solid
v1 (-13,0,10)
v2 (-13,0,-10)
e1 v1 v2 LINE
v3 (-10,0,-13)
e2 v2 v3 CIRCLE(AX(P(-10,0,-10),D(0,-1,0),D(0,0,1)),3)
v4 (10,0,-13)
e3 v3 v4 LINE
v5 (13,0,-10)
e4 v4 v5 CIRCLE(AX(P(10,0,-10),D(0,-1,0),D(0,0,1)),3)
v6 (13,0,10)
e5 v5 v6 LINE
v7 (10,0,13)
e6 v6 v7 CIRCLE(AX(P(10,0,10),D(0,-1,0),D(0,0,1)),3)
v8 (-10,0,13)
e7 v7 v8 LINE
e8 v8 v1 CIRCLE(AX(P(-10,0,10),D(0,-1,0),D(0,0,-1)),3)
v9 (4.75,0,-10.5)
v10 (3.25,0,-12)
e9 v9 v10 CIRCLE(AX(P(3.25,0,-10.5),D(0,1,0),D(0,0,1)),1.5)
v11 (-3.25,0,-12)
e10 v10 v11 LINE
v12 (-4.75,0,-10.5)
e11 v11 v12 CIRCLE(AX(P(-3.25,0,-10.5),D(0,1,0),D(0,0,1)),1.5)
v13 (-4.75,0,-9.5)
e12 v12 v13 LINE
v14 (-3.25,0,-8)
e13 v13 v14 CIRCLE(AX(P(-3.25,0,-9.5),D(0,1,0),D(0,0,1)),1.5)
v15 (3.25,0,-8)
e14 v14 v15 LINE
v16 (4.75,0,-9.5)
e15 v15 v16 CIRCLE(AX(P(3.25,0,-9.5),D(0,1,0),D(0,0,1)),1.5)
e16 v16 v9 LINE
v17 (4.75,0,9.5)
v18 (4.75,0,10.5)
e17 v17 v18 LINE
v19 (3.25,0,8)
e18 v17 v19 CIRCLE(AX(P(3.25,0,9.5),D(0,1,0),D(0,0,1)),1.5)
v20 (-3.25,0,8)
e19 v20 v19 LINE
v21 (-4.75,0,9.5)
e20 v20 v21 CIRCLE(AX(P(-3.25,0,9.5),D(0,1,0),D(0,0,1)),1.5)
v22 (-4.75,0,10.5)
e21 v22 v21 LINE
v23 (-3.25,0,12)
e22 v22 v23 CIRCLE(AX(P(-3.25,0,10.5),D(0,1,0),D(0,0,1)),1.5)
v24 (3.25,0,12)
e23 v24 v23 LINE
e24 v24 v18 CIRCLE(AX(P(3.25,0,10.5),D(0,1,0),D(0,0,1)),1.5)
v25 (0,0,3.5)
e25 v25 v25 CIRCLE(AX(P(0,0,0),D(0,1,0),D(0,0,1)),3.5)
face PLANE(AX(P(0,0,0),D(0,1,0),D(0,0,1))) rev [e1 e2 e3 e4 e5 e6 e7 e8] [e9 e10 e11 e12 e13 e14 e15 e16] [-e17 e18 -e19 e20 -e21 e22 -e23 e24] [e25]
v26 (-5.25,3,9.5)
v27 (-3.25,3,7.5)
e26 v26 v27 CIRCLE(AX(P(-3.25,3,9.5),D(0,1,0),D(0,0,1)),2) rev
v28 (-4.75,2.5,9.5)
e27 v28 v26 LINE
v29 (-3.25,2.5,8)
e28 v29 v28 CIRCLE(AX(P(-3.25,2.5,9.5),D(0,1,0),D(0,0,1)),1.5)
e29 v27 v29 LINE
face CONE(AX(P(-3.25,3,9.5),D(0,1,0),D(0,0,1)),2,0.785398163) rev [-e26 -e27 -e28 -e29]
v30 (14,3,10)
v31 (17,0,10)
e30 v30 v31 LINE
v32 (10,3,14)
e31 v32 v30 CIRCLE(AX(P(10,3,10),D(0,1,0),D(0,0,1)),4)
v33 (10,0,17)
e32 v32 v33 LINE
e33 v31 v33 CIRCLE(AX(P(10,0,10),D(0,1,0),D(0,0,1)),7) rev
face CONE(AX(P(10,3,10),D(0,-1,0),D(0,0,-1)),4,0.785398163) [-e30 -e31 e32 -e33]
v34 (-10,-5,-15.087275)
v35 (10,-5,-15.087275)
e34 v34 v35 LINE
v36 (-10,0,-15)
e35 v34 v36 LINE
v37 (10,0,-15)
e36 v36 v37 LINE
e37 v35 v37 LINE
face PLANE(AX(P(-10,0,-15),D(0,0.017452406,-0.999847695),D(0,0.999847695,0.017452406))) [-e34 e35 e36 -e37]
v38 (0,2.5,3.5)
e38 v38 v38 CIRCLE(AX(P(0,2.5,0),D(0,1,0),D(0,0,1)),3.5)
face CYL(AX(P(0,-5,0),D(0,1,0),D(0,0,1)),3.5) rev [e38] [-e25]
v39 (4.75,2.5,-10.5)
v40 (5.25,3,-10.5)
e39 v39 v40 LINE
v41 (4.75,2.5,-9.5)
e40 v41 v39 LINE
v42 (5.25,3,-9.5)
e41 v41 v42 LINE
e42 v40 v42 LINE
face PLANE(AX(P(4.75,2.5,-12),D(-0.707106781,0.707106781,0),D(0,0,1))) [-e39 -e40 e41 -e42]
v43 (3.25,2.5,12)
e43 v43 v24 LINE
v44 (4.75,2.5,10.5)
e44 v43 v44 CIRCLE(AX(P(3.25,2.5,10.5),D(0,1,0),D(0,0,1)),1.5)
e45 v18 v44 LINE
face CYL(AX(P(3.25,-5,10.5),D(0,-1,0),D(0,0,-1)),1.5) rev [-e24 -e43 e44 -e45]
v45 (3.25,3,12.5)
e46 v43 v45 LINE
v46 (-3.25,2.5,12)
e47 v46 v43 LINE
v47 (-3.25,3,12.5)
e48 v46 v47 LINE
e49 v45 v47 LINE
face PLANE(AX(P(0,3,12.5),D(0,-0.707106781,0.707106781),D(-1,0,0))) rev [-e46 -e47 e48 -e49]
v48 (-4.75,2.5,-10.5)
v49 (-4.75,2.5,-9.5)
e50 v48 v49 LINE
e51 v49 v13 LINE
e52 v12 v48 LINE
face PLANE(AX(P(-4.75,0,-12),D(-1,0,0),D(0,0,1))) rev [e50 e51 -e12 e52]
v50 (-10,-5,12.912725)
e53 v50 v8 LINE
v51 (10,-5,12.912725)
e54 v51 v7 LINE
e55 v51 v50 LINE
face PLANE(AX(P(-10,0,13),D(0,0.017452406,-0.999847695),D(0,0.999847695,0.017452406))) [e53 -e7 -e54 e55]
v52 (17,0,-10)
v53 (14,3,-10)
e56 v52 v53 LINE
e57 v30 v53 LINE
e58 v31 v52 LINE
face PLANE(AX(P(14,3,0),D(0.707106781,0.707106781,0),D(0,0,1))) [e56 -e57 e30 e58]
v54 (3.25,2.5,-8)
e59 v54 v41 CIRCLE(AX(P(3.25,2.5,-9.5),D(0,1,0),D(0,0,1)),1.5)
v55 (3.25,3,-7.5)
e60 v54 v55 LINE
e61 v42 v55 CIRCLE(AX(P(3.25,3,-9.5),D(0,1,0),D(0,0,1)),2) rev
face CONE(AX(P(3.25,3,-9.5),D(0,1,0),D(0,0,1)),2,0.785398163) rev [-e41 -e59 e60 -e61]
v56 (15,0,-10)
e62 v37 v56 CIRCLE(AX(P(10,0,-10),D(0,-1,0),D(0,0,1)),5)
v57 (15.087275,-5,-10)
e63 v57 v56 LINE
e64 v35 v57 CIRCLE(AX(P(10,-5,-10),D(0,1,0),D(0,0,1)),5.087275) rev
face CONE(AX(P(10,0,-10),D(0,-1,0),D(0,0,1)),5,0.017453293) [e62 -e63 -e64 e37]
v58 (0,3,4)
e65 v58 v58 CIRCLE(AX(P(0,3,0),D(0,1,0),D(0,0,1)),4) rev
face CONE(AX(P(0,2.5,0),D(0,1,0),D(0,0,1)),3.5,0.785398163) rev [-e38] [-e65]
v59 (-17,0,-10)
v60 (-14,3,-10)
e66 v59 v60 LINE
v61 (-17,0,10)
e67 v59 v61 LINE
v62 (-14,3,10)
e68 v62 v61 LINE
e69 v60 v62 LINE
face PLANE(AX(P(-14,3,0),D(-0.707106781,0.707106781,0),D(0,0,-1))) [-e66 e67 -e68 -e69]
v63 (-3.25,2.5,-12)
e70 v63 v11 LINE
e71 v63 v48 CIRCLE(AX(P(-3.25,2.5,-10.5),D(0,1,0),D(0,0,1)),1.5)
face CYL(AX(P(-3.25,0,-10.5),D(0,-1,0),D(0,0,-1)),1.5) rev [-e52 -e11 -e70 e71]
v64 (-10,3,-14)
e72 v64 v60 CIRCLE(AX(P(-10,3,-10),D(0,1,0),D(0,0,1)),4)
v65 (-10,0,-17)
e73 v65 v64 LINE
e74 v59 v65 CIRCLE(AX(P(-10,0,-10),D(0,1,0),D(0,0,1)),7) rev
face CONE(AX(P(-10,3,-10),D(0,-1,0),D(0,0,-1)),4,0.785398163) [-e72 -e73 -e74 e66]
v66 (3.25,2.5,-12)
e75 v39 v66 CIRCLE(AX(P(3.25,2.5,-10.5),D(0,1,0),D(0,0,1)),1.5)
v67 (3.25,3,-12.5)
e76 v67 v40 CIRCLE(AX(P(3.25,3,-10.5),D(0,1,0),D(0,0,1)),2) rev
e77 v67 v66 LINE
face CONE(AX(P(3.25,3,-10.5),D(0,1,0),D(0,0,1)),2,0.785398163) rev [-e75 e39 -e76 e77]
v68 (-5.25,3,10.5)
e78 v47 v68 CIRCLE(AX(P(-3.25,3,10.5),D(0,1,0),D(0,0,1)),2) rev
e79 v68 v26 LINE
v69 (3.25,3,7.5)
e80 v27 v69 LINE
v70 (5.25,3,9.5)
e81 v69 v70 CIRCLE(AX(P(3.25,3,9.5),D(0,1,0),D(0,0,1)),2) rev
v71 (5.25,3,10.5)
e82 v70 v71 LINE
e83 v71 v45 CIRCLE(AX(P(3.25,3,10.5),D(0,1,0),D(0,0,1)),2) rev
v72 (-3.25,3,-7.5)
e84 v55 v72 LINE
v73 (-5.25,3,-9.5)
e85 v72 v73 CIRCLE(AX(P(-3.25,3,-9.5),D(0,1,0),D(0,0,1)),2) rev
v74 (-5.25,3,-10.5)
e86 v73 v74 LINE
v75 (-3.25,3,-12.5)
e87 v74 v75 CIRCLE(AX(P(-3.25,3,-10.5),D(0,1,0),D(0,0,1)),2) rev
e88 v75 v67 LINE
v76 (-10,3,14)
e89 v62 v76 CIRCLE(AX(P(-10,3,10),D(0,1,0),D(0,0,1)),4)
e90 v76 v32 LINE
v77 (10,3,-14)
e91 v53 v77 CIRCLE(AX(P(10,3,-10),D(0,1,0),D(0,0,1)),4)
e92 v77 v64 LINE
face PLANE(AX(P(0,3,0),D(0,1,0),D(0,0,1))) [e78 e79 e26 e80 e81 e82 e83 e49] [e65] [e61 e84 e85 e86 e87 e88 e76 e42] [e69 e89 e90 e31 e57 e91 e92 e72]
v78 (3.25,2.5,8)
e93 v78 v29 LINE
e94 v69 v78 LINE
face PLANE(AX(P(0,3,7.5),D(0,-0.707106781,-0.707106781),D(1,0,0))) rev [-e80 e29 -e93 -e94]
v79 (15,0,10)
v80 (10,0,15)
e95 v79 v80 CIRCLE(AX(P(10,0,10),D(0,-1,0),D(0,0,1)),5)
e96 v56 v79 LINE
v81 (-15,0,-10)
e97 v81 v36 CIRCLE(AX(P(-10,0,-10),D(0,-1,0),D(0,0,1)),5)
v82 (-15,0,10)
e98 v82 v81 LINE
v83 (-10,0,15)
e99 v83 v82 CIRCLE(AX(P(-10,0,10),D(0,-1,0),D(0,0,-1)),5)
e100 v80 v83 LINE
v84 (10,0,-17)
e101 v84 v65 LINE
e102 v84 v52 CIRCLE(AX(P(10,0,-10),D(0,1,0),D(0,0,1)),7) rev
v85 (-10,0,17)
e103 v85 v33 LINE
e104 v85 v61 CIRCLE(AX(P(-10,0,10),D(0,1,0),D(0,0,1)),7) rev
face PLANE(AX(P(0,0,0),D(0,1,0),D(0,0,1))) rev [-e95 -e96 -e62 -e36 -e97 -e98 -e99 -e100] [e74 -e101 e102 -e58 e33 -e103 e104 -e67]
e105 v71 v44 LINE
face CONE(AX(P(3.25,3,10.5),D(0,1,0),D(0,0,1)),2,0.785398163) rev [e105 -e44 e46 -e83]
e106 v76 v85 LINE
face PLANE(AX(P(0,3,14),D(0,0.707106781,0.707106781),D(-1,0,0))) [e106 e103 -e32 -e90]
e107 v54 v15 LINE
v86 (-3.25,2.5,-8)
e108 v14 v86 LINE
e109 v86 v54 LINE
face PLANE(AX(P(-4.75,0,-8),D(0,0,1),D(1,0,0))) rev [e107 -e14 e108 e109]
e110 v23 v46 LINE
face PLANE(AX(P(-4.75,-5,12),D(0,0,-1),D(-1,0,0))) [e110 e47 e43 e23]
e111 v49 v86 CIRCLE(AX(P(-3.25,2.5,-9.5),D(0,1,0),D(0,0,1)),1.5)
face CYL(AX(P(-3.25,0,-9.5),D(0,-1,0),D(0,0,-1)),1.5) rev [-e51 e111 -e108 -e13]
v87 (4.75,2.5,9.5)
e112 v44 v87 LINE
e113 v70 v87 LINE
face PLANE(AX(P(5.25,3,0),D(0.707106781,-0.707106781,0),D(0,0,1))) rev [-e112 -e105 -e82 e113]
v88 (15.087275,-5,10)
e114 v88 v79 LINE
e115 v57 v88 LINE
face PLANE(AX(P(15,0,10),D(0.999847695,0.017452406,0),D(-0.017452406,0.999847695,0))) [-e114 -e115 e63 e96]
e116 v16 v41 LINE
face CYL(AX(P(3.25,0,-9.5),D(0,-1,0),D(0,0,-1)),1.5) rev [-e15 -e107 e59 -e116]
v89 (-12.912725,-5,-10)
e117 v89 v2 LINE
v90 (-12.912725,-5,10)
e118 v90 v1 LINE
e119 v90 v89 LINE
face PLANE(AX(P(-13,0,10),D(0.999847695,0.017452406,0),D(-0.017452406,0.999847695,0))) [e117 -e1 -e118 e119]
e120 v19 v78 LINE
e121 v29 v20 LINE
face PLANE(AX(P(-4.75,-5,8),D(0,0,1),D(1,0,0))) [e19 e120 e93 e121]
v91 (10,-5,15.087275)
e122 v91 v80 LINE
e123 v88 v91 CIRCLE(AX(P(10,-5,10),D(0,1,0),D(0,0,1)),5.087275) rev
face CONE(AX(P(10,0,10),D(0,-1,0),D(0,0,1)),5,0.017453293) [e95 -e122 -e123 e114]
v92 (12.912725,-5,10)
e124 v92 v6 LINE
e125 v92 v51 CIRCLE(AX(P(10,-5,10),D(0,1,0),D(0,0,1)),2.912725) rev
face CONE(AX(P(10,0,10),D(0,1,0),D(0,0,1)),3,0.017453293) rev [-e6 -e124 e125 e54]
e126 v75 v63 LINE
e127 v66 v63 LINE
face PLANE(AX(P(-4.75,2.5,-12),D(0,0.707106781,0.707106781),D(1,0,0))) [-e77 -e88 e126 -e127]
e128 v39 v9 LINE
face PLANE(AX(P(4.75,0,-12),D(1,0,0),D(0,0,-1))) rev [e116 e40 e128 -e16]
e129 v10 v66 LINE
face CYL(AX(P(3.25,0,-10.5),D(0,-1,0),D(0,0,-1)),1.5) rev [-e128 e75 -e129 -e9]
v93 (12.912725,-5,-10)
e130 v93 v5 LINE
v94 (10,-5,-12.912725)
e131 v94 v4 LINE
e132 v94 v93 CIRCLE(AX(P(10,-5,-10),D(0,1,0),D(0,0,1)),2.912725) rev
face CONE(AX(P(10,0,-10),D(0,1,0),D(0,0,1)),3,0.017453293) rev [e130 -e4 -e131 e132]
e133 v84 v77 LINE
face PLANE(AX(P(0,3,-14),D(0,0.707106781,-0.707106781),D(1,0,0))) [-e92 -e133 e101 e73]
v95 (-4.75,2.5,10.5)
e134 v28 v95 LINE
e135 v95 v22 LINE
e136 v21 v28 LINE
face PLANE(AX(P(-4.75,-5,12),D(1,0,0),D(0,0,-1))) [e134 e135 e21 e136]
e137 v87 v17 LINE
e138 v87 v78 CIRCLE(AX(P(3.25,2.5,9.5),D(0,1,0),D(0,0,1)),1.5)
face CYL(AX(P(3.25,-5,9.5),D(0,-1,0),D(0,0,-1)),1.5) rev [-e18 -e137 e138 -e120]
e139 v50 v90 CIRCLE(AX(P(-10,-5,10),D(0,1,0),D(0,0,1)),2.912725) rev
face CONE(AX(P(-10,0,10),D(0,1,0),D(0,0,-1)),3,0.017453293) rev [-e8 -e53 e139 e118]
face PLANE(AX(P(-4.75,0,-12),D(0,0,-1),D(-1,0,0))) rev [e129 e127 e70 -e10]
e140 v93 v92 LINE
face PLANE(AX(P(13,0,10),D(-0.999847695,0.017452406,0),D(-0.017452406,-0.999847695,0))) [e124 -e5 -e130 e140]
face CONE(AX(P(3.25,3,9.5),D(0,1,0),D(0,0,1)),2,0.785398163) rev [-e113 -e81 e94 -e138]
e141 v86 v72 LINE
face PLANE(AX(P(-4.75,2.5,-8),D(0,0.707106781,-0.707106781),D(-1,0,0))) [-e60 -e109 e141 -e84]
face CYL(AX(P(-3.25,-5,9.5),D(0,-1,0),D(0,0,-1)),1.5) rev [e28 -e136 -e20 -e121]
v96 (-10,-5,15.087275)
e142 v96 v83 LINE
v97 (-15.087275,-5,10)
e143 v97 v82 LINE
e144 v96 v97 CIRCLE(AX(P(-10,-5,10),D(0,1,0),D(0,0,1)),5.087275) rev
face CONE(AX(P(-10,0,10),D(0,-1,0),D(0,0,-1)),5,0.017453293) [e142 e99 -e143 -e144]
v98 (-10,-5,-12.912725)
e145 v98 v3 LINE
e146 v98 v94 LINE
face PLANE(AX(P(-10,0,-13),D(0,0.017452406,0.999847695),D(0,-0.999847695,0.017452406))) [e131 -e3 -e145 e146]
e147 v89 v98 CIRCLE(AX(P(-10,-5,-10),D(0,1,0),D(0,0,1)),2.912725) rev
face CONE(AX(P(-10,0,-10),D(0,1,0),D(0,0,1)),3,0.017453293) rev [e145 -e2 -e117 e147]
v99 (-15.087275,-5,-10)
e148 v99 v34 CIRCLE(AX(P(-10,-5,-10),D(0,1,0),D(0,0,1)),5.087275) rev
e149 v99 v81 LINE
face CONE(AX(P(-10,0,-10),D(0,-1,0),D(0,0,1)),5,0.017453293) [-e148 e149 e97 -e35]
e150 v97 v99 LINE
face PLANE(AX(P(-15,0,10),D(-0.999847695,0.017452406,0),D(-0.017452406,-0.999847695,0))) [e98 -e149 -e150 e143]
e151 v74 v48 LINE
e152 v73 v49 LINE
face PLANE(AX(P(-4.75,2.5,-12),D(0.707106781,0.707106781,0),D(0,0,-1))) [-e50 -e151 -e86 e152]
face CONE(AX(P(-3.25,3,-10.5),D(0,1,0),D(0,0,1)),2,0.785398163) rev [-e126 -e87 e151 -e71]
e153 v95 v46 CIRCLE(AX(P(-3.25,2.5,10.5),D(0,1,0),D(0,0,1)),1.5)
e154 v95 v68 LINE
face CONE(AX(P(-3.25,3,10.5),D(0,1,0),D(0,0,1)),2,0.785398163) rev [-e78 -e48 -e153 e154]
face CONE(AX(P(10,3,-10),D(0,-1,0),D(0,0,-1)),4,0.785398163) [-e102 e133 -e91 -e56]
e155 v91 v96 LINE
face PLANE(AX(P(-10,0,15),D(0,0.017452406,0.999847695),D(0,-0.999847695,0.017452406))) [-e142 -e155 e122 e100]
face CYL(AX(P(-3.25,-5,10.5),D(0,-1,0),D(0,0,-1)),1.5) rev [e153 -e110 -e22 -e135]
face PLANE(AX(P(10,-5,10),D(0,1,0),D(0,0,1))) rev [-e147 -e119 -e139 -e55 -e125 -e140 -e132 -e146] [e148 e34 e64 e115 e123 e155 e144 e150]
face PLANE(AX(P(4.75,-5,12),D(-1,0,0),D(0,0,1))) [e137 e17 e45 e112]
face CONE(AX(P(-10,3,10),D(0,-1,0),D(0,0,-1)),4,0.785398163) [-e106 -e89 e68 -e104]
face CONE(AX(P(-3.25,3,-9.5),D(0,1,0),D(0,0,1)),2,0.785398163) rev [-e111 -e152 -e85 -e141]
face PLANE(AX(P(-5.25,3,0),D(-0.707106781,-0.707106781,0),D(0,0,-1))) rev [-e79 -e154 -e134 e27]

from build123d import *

# Parameters (mm, degrees)
CROQUIS1_W                 = 34
CROQUIS1_H                 = 34
SALIENTE_EXTRUIR1_DEPTH    = 3
REDONDEO1_R                = 7
CHAFL_N1_SIZE              = 3
CROQUIS2_W                 = 9.5
CROQUIS2_H                 = 4
CORTAR_EXTRUIR1_DEPTH      = 25.228082879
REDONDEO2_R                = 1.5
CHAFL_N2_SIZE              = 0.5
SALIENTE_EXTRUIR2_DEPTH    = 5
SALIENTE_EXTRUIR2_DRAFT    = -1
CROQUIS9_R                 = 3.5
CORTAR_EXTRUIR2_DEPTH      = 26.337718919
CHAFL_N3_SIZE              = 0.5
REDONDEO2_OF_SIMETR_A1_R   = 1.5
CHAFL_N2_OF_SIMETR_A1_SIZE = 0.5


with BuildPart() as part:
    # Croquis1 → Saliente-Extruir1 (new body)
    with BuildSketch(Plane(origin=(0, 0, 0), x_dir=(1, 0, 0), z_dir=(0, 1, 0))):
        Rectangle(CROQUIS1_W, CROQUIS1_H)
    extrude(amount=SALIENTE_EXTRUIR1_DEPTH)

    # Redondeo1
    redondeo1_edges = [part.edges().sort_by_distance(p)[0] for p in [
        (17, 1.5, 17),
        (-17, 1.5, 17),
        (-17, 1.5, -17),
        (17, 1.5, -17),
    ]]
    fillet(redondeo1_edges, radius=REDONDEO1_R)

    # Chaflán1
    chafl_n1_edges = [part.edges().sort_by_distance(p)[0] for p in [
        (17, 3, 0),
        (14.949747468, 3, -14.949747468),
        (14.949747468, 3, 14.949747468),
        (0, 3, -17),
        (0, 3, 17),
        (-14.949747468, 3, -14.949747468),
        (-14.949747468, 3, 14.949747468),
        (-17, 3, 0),
    ]]
    chamfer(chafl_n1_edges, length=CHAFL_N1_SIZE - 0.0001)  # a hair under: the kernel refuses the full size

    # Croquis2 → Cortar-Extruir1 (cut, through all)
    with BuildSketch(Plane(origin=(0, 3, 0), x_dir=(1, 0, 0), z_dir=(0, 1, 0))):
        with Locations((0, 10)):
            Rectangle(CROQUIS2_W, CROQUIS2_H)
    cortar_extruir1 = extrude(amount=-CORTAR_EXTRUIR1_DEPTH, mode=Mode.SUBTRACT)

    # Redondeo2
    redondeo2_edges = [part.edges().sort_by_distance(p)[0] for p in [
        (4.75, 1.5, -12),
        (4.75, 1.5, -8),
        (-4.75, 1.5, -8),
        (-4.75, 1.5, -12),
    ]]
    fillet(redondeo2_edges, radius=REDONDEO2_R)

    # Chaflán2
    chafl_n2_edges = [part.edges().sort_by_distance(p)[0] for p in [
        (0, 3, -8),
        (-4.75, 3, -10),
        (4.75, 3, -10),
        (0, 3, -12),
        (-4.310660172, 3, -8.439339828),
        (4.310660172, 3, -8.439339828),
        (4.310660172, 3, -11.560660172),
        (-4.310660172, 3, -11.560660172),
    ]]
    chamfer(chafl_n2_edges, length=CHAFL_N2_SIZE)


with BuildPart() as saliente_extruir2_tool:
    # Croquis8 → Saliente-Extruir2 (with draft: the straight prism first)
    with BuildSketch(Plane.XZ):
        with BuildLine():
            ThreePointArc((-10, 15), (-13.535533906, 13.535533906), (-15, 10))
            Line((-15, 10), (-15, -10))
            ThreePointArc((-15, -10), (-13.535533906, -13.535533906), (-10, -15))
            Line((-10, -15), (10, -15))
            ThreePointArc((10, -15), (13.535533906, -13.535533906), (15, -10))
            Line((15, -10), (15, 10))
            ThreePointArc((15, 10), (13.535533906, 13.535533906), (10, 15))
            Line((10, 15), (-10, 15))
        make_face()
        with BuildLine():
            Line((-13, 10), (-13, -10))
            ThreePointArc((-13, -10), (-12.121320344, -12.121320344), (-10, -13))
            Line((-10, -13), (10, -13))
            ThreePointArc((10, -13), (12.121320344, -12.121320344), (13, -10))
            Line((13, -10), (13, 10))
            ThreePointArc((13, 10), (12.121320344, 12.121320344), (10, 13))
            Line((10, 13), (-10, 13))
            ThreePointArc((-10, 13), (-12.121320344, 12.121320344), (-13, 10))
        make_face(mode=Mode.SUBTRACT)
    extrude(amount=SALIENTE_EXTRUIR2_DEPTH)
    # Saliente-Extruir2: the draft: its side faces are tilted about the plane it starts from
    saliente_extruir2_sides = [saliente_extruir2_tool.faces().sort_by_distance(p)[0] for p in [
        (0, -2.5, 15),
        (-13.535533906, -2.5, 13.535533906),
        (-15, -2.5, 0),
        (-13.535533906, -2.5, -13.535533906),
        (0, -2.5, -15),
        (13.535533906, -2.5, -13.535533906),
        (15, -2.5, 0),
        (13.535533906, -2.5, 13.535533906),
        (12.121320344, -2.5, 12.121320344),
        (13, -2.5, 0),
        (12.121320344, -2.5, -12.121320344),
        (0, -2.5, -13),
        (-12.121320344, -2.5, -12.121320344),
        (-13, -2.5, 0),
        (-12.121320344, -2.5, 12.121320344),
        (0, -2.5, 13),
    ]]
    draft(saliente_extruir2_sides, Plane.XZ, SALIENTE_EXTRUIR2_DRAFT)


with BuildPart() as part_1:
    add(part.part)

    # Saliente-Extruir2: add saliente_extruir2_tool
    add(saliente_extruir2_tool.part)

    # Croquis9 → Cortar-Extruir2 (cut, through all)
    with BuildSketch(Plane(origin=(0, 3, 0), x_dir=(1, 0, 0), z_dir=(0, 1, 0))):
        with Locations(Location((0, 0, 0), (0, 0, 270))):
            Circle(CROQUIS9_R)
    extrude(amount=-CORTAR_EXTRUIR2_DEPTH, mode=Mode.SUBTRACT)

    # Chaflán3
    chafl_n3_edges = [part_1.edges().sort_by_distance(p)[0] for p in [
        (0, 3, -3.5),
    ]]
    chamfer(chafl_n3_edges, length=CHAFL_N3_SIZE)

    # Simetría1: Cortar-Extruir1 across plane
    add(cortar_extruir1.mirror(Plane.XY), mode=Mode.SUBTRACT)

    # Redondeo2 of Simetría1
    redondeo2_of_simetr_a1_edges = [part_1.edges().sort_by_distance(p)[0] for p in [
        (4.75, 1.5, 12),
        (4.75, 1.5, 8),
        (-4.75, 1.5, 8),
        (-4.75, 1.5, 12),
    ]]
    fillet(redondeo2_of_simetr_a1_edges, radius=REDONDEO2_OF_SIMETR_A1_R)

    # Chaflán2 of Simetría1
    chafl_n2_of_simetr_a1_edges = [part_1.edges().sort_by_distance(p)[0] for p in [
        (0, 3, 8),
        (-4.75, 3, 10),
        (4.75, 3, 10),
        (0, 3, 12),
        (-4.310660172, 3, 8.439339828),
        (4.310660172, 3, 8.439339828),
        (4.310660172, 3, 11.560660172),
        (-4.310660172, 3, 11.560660172),
    ]]
    chamfer(chafl_n2_of_simetr_a1_edges, length=CHAFL_N2_OF_SIMETR_A1_SIZE)


solid = part_1.part
